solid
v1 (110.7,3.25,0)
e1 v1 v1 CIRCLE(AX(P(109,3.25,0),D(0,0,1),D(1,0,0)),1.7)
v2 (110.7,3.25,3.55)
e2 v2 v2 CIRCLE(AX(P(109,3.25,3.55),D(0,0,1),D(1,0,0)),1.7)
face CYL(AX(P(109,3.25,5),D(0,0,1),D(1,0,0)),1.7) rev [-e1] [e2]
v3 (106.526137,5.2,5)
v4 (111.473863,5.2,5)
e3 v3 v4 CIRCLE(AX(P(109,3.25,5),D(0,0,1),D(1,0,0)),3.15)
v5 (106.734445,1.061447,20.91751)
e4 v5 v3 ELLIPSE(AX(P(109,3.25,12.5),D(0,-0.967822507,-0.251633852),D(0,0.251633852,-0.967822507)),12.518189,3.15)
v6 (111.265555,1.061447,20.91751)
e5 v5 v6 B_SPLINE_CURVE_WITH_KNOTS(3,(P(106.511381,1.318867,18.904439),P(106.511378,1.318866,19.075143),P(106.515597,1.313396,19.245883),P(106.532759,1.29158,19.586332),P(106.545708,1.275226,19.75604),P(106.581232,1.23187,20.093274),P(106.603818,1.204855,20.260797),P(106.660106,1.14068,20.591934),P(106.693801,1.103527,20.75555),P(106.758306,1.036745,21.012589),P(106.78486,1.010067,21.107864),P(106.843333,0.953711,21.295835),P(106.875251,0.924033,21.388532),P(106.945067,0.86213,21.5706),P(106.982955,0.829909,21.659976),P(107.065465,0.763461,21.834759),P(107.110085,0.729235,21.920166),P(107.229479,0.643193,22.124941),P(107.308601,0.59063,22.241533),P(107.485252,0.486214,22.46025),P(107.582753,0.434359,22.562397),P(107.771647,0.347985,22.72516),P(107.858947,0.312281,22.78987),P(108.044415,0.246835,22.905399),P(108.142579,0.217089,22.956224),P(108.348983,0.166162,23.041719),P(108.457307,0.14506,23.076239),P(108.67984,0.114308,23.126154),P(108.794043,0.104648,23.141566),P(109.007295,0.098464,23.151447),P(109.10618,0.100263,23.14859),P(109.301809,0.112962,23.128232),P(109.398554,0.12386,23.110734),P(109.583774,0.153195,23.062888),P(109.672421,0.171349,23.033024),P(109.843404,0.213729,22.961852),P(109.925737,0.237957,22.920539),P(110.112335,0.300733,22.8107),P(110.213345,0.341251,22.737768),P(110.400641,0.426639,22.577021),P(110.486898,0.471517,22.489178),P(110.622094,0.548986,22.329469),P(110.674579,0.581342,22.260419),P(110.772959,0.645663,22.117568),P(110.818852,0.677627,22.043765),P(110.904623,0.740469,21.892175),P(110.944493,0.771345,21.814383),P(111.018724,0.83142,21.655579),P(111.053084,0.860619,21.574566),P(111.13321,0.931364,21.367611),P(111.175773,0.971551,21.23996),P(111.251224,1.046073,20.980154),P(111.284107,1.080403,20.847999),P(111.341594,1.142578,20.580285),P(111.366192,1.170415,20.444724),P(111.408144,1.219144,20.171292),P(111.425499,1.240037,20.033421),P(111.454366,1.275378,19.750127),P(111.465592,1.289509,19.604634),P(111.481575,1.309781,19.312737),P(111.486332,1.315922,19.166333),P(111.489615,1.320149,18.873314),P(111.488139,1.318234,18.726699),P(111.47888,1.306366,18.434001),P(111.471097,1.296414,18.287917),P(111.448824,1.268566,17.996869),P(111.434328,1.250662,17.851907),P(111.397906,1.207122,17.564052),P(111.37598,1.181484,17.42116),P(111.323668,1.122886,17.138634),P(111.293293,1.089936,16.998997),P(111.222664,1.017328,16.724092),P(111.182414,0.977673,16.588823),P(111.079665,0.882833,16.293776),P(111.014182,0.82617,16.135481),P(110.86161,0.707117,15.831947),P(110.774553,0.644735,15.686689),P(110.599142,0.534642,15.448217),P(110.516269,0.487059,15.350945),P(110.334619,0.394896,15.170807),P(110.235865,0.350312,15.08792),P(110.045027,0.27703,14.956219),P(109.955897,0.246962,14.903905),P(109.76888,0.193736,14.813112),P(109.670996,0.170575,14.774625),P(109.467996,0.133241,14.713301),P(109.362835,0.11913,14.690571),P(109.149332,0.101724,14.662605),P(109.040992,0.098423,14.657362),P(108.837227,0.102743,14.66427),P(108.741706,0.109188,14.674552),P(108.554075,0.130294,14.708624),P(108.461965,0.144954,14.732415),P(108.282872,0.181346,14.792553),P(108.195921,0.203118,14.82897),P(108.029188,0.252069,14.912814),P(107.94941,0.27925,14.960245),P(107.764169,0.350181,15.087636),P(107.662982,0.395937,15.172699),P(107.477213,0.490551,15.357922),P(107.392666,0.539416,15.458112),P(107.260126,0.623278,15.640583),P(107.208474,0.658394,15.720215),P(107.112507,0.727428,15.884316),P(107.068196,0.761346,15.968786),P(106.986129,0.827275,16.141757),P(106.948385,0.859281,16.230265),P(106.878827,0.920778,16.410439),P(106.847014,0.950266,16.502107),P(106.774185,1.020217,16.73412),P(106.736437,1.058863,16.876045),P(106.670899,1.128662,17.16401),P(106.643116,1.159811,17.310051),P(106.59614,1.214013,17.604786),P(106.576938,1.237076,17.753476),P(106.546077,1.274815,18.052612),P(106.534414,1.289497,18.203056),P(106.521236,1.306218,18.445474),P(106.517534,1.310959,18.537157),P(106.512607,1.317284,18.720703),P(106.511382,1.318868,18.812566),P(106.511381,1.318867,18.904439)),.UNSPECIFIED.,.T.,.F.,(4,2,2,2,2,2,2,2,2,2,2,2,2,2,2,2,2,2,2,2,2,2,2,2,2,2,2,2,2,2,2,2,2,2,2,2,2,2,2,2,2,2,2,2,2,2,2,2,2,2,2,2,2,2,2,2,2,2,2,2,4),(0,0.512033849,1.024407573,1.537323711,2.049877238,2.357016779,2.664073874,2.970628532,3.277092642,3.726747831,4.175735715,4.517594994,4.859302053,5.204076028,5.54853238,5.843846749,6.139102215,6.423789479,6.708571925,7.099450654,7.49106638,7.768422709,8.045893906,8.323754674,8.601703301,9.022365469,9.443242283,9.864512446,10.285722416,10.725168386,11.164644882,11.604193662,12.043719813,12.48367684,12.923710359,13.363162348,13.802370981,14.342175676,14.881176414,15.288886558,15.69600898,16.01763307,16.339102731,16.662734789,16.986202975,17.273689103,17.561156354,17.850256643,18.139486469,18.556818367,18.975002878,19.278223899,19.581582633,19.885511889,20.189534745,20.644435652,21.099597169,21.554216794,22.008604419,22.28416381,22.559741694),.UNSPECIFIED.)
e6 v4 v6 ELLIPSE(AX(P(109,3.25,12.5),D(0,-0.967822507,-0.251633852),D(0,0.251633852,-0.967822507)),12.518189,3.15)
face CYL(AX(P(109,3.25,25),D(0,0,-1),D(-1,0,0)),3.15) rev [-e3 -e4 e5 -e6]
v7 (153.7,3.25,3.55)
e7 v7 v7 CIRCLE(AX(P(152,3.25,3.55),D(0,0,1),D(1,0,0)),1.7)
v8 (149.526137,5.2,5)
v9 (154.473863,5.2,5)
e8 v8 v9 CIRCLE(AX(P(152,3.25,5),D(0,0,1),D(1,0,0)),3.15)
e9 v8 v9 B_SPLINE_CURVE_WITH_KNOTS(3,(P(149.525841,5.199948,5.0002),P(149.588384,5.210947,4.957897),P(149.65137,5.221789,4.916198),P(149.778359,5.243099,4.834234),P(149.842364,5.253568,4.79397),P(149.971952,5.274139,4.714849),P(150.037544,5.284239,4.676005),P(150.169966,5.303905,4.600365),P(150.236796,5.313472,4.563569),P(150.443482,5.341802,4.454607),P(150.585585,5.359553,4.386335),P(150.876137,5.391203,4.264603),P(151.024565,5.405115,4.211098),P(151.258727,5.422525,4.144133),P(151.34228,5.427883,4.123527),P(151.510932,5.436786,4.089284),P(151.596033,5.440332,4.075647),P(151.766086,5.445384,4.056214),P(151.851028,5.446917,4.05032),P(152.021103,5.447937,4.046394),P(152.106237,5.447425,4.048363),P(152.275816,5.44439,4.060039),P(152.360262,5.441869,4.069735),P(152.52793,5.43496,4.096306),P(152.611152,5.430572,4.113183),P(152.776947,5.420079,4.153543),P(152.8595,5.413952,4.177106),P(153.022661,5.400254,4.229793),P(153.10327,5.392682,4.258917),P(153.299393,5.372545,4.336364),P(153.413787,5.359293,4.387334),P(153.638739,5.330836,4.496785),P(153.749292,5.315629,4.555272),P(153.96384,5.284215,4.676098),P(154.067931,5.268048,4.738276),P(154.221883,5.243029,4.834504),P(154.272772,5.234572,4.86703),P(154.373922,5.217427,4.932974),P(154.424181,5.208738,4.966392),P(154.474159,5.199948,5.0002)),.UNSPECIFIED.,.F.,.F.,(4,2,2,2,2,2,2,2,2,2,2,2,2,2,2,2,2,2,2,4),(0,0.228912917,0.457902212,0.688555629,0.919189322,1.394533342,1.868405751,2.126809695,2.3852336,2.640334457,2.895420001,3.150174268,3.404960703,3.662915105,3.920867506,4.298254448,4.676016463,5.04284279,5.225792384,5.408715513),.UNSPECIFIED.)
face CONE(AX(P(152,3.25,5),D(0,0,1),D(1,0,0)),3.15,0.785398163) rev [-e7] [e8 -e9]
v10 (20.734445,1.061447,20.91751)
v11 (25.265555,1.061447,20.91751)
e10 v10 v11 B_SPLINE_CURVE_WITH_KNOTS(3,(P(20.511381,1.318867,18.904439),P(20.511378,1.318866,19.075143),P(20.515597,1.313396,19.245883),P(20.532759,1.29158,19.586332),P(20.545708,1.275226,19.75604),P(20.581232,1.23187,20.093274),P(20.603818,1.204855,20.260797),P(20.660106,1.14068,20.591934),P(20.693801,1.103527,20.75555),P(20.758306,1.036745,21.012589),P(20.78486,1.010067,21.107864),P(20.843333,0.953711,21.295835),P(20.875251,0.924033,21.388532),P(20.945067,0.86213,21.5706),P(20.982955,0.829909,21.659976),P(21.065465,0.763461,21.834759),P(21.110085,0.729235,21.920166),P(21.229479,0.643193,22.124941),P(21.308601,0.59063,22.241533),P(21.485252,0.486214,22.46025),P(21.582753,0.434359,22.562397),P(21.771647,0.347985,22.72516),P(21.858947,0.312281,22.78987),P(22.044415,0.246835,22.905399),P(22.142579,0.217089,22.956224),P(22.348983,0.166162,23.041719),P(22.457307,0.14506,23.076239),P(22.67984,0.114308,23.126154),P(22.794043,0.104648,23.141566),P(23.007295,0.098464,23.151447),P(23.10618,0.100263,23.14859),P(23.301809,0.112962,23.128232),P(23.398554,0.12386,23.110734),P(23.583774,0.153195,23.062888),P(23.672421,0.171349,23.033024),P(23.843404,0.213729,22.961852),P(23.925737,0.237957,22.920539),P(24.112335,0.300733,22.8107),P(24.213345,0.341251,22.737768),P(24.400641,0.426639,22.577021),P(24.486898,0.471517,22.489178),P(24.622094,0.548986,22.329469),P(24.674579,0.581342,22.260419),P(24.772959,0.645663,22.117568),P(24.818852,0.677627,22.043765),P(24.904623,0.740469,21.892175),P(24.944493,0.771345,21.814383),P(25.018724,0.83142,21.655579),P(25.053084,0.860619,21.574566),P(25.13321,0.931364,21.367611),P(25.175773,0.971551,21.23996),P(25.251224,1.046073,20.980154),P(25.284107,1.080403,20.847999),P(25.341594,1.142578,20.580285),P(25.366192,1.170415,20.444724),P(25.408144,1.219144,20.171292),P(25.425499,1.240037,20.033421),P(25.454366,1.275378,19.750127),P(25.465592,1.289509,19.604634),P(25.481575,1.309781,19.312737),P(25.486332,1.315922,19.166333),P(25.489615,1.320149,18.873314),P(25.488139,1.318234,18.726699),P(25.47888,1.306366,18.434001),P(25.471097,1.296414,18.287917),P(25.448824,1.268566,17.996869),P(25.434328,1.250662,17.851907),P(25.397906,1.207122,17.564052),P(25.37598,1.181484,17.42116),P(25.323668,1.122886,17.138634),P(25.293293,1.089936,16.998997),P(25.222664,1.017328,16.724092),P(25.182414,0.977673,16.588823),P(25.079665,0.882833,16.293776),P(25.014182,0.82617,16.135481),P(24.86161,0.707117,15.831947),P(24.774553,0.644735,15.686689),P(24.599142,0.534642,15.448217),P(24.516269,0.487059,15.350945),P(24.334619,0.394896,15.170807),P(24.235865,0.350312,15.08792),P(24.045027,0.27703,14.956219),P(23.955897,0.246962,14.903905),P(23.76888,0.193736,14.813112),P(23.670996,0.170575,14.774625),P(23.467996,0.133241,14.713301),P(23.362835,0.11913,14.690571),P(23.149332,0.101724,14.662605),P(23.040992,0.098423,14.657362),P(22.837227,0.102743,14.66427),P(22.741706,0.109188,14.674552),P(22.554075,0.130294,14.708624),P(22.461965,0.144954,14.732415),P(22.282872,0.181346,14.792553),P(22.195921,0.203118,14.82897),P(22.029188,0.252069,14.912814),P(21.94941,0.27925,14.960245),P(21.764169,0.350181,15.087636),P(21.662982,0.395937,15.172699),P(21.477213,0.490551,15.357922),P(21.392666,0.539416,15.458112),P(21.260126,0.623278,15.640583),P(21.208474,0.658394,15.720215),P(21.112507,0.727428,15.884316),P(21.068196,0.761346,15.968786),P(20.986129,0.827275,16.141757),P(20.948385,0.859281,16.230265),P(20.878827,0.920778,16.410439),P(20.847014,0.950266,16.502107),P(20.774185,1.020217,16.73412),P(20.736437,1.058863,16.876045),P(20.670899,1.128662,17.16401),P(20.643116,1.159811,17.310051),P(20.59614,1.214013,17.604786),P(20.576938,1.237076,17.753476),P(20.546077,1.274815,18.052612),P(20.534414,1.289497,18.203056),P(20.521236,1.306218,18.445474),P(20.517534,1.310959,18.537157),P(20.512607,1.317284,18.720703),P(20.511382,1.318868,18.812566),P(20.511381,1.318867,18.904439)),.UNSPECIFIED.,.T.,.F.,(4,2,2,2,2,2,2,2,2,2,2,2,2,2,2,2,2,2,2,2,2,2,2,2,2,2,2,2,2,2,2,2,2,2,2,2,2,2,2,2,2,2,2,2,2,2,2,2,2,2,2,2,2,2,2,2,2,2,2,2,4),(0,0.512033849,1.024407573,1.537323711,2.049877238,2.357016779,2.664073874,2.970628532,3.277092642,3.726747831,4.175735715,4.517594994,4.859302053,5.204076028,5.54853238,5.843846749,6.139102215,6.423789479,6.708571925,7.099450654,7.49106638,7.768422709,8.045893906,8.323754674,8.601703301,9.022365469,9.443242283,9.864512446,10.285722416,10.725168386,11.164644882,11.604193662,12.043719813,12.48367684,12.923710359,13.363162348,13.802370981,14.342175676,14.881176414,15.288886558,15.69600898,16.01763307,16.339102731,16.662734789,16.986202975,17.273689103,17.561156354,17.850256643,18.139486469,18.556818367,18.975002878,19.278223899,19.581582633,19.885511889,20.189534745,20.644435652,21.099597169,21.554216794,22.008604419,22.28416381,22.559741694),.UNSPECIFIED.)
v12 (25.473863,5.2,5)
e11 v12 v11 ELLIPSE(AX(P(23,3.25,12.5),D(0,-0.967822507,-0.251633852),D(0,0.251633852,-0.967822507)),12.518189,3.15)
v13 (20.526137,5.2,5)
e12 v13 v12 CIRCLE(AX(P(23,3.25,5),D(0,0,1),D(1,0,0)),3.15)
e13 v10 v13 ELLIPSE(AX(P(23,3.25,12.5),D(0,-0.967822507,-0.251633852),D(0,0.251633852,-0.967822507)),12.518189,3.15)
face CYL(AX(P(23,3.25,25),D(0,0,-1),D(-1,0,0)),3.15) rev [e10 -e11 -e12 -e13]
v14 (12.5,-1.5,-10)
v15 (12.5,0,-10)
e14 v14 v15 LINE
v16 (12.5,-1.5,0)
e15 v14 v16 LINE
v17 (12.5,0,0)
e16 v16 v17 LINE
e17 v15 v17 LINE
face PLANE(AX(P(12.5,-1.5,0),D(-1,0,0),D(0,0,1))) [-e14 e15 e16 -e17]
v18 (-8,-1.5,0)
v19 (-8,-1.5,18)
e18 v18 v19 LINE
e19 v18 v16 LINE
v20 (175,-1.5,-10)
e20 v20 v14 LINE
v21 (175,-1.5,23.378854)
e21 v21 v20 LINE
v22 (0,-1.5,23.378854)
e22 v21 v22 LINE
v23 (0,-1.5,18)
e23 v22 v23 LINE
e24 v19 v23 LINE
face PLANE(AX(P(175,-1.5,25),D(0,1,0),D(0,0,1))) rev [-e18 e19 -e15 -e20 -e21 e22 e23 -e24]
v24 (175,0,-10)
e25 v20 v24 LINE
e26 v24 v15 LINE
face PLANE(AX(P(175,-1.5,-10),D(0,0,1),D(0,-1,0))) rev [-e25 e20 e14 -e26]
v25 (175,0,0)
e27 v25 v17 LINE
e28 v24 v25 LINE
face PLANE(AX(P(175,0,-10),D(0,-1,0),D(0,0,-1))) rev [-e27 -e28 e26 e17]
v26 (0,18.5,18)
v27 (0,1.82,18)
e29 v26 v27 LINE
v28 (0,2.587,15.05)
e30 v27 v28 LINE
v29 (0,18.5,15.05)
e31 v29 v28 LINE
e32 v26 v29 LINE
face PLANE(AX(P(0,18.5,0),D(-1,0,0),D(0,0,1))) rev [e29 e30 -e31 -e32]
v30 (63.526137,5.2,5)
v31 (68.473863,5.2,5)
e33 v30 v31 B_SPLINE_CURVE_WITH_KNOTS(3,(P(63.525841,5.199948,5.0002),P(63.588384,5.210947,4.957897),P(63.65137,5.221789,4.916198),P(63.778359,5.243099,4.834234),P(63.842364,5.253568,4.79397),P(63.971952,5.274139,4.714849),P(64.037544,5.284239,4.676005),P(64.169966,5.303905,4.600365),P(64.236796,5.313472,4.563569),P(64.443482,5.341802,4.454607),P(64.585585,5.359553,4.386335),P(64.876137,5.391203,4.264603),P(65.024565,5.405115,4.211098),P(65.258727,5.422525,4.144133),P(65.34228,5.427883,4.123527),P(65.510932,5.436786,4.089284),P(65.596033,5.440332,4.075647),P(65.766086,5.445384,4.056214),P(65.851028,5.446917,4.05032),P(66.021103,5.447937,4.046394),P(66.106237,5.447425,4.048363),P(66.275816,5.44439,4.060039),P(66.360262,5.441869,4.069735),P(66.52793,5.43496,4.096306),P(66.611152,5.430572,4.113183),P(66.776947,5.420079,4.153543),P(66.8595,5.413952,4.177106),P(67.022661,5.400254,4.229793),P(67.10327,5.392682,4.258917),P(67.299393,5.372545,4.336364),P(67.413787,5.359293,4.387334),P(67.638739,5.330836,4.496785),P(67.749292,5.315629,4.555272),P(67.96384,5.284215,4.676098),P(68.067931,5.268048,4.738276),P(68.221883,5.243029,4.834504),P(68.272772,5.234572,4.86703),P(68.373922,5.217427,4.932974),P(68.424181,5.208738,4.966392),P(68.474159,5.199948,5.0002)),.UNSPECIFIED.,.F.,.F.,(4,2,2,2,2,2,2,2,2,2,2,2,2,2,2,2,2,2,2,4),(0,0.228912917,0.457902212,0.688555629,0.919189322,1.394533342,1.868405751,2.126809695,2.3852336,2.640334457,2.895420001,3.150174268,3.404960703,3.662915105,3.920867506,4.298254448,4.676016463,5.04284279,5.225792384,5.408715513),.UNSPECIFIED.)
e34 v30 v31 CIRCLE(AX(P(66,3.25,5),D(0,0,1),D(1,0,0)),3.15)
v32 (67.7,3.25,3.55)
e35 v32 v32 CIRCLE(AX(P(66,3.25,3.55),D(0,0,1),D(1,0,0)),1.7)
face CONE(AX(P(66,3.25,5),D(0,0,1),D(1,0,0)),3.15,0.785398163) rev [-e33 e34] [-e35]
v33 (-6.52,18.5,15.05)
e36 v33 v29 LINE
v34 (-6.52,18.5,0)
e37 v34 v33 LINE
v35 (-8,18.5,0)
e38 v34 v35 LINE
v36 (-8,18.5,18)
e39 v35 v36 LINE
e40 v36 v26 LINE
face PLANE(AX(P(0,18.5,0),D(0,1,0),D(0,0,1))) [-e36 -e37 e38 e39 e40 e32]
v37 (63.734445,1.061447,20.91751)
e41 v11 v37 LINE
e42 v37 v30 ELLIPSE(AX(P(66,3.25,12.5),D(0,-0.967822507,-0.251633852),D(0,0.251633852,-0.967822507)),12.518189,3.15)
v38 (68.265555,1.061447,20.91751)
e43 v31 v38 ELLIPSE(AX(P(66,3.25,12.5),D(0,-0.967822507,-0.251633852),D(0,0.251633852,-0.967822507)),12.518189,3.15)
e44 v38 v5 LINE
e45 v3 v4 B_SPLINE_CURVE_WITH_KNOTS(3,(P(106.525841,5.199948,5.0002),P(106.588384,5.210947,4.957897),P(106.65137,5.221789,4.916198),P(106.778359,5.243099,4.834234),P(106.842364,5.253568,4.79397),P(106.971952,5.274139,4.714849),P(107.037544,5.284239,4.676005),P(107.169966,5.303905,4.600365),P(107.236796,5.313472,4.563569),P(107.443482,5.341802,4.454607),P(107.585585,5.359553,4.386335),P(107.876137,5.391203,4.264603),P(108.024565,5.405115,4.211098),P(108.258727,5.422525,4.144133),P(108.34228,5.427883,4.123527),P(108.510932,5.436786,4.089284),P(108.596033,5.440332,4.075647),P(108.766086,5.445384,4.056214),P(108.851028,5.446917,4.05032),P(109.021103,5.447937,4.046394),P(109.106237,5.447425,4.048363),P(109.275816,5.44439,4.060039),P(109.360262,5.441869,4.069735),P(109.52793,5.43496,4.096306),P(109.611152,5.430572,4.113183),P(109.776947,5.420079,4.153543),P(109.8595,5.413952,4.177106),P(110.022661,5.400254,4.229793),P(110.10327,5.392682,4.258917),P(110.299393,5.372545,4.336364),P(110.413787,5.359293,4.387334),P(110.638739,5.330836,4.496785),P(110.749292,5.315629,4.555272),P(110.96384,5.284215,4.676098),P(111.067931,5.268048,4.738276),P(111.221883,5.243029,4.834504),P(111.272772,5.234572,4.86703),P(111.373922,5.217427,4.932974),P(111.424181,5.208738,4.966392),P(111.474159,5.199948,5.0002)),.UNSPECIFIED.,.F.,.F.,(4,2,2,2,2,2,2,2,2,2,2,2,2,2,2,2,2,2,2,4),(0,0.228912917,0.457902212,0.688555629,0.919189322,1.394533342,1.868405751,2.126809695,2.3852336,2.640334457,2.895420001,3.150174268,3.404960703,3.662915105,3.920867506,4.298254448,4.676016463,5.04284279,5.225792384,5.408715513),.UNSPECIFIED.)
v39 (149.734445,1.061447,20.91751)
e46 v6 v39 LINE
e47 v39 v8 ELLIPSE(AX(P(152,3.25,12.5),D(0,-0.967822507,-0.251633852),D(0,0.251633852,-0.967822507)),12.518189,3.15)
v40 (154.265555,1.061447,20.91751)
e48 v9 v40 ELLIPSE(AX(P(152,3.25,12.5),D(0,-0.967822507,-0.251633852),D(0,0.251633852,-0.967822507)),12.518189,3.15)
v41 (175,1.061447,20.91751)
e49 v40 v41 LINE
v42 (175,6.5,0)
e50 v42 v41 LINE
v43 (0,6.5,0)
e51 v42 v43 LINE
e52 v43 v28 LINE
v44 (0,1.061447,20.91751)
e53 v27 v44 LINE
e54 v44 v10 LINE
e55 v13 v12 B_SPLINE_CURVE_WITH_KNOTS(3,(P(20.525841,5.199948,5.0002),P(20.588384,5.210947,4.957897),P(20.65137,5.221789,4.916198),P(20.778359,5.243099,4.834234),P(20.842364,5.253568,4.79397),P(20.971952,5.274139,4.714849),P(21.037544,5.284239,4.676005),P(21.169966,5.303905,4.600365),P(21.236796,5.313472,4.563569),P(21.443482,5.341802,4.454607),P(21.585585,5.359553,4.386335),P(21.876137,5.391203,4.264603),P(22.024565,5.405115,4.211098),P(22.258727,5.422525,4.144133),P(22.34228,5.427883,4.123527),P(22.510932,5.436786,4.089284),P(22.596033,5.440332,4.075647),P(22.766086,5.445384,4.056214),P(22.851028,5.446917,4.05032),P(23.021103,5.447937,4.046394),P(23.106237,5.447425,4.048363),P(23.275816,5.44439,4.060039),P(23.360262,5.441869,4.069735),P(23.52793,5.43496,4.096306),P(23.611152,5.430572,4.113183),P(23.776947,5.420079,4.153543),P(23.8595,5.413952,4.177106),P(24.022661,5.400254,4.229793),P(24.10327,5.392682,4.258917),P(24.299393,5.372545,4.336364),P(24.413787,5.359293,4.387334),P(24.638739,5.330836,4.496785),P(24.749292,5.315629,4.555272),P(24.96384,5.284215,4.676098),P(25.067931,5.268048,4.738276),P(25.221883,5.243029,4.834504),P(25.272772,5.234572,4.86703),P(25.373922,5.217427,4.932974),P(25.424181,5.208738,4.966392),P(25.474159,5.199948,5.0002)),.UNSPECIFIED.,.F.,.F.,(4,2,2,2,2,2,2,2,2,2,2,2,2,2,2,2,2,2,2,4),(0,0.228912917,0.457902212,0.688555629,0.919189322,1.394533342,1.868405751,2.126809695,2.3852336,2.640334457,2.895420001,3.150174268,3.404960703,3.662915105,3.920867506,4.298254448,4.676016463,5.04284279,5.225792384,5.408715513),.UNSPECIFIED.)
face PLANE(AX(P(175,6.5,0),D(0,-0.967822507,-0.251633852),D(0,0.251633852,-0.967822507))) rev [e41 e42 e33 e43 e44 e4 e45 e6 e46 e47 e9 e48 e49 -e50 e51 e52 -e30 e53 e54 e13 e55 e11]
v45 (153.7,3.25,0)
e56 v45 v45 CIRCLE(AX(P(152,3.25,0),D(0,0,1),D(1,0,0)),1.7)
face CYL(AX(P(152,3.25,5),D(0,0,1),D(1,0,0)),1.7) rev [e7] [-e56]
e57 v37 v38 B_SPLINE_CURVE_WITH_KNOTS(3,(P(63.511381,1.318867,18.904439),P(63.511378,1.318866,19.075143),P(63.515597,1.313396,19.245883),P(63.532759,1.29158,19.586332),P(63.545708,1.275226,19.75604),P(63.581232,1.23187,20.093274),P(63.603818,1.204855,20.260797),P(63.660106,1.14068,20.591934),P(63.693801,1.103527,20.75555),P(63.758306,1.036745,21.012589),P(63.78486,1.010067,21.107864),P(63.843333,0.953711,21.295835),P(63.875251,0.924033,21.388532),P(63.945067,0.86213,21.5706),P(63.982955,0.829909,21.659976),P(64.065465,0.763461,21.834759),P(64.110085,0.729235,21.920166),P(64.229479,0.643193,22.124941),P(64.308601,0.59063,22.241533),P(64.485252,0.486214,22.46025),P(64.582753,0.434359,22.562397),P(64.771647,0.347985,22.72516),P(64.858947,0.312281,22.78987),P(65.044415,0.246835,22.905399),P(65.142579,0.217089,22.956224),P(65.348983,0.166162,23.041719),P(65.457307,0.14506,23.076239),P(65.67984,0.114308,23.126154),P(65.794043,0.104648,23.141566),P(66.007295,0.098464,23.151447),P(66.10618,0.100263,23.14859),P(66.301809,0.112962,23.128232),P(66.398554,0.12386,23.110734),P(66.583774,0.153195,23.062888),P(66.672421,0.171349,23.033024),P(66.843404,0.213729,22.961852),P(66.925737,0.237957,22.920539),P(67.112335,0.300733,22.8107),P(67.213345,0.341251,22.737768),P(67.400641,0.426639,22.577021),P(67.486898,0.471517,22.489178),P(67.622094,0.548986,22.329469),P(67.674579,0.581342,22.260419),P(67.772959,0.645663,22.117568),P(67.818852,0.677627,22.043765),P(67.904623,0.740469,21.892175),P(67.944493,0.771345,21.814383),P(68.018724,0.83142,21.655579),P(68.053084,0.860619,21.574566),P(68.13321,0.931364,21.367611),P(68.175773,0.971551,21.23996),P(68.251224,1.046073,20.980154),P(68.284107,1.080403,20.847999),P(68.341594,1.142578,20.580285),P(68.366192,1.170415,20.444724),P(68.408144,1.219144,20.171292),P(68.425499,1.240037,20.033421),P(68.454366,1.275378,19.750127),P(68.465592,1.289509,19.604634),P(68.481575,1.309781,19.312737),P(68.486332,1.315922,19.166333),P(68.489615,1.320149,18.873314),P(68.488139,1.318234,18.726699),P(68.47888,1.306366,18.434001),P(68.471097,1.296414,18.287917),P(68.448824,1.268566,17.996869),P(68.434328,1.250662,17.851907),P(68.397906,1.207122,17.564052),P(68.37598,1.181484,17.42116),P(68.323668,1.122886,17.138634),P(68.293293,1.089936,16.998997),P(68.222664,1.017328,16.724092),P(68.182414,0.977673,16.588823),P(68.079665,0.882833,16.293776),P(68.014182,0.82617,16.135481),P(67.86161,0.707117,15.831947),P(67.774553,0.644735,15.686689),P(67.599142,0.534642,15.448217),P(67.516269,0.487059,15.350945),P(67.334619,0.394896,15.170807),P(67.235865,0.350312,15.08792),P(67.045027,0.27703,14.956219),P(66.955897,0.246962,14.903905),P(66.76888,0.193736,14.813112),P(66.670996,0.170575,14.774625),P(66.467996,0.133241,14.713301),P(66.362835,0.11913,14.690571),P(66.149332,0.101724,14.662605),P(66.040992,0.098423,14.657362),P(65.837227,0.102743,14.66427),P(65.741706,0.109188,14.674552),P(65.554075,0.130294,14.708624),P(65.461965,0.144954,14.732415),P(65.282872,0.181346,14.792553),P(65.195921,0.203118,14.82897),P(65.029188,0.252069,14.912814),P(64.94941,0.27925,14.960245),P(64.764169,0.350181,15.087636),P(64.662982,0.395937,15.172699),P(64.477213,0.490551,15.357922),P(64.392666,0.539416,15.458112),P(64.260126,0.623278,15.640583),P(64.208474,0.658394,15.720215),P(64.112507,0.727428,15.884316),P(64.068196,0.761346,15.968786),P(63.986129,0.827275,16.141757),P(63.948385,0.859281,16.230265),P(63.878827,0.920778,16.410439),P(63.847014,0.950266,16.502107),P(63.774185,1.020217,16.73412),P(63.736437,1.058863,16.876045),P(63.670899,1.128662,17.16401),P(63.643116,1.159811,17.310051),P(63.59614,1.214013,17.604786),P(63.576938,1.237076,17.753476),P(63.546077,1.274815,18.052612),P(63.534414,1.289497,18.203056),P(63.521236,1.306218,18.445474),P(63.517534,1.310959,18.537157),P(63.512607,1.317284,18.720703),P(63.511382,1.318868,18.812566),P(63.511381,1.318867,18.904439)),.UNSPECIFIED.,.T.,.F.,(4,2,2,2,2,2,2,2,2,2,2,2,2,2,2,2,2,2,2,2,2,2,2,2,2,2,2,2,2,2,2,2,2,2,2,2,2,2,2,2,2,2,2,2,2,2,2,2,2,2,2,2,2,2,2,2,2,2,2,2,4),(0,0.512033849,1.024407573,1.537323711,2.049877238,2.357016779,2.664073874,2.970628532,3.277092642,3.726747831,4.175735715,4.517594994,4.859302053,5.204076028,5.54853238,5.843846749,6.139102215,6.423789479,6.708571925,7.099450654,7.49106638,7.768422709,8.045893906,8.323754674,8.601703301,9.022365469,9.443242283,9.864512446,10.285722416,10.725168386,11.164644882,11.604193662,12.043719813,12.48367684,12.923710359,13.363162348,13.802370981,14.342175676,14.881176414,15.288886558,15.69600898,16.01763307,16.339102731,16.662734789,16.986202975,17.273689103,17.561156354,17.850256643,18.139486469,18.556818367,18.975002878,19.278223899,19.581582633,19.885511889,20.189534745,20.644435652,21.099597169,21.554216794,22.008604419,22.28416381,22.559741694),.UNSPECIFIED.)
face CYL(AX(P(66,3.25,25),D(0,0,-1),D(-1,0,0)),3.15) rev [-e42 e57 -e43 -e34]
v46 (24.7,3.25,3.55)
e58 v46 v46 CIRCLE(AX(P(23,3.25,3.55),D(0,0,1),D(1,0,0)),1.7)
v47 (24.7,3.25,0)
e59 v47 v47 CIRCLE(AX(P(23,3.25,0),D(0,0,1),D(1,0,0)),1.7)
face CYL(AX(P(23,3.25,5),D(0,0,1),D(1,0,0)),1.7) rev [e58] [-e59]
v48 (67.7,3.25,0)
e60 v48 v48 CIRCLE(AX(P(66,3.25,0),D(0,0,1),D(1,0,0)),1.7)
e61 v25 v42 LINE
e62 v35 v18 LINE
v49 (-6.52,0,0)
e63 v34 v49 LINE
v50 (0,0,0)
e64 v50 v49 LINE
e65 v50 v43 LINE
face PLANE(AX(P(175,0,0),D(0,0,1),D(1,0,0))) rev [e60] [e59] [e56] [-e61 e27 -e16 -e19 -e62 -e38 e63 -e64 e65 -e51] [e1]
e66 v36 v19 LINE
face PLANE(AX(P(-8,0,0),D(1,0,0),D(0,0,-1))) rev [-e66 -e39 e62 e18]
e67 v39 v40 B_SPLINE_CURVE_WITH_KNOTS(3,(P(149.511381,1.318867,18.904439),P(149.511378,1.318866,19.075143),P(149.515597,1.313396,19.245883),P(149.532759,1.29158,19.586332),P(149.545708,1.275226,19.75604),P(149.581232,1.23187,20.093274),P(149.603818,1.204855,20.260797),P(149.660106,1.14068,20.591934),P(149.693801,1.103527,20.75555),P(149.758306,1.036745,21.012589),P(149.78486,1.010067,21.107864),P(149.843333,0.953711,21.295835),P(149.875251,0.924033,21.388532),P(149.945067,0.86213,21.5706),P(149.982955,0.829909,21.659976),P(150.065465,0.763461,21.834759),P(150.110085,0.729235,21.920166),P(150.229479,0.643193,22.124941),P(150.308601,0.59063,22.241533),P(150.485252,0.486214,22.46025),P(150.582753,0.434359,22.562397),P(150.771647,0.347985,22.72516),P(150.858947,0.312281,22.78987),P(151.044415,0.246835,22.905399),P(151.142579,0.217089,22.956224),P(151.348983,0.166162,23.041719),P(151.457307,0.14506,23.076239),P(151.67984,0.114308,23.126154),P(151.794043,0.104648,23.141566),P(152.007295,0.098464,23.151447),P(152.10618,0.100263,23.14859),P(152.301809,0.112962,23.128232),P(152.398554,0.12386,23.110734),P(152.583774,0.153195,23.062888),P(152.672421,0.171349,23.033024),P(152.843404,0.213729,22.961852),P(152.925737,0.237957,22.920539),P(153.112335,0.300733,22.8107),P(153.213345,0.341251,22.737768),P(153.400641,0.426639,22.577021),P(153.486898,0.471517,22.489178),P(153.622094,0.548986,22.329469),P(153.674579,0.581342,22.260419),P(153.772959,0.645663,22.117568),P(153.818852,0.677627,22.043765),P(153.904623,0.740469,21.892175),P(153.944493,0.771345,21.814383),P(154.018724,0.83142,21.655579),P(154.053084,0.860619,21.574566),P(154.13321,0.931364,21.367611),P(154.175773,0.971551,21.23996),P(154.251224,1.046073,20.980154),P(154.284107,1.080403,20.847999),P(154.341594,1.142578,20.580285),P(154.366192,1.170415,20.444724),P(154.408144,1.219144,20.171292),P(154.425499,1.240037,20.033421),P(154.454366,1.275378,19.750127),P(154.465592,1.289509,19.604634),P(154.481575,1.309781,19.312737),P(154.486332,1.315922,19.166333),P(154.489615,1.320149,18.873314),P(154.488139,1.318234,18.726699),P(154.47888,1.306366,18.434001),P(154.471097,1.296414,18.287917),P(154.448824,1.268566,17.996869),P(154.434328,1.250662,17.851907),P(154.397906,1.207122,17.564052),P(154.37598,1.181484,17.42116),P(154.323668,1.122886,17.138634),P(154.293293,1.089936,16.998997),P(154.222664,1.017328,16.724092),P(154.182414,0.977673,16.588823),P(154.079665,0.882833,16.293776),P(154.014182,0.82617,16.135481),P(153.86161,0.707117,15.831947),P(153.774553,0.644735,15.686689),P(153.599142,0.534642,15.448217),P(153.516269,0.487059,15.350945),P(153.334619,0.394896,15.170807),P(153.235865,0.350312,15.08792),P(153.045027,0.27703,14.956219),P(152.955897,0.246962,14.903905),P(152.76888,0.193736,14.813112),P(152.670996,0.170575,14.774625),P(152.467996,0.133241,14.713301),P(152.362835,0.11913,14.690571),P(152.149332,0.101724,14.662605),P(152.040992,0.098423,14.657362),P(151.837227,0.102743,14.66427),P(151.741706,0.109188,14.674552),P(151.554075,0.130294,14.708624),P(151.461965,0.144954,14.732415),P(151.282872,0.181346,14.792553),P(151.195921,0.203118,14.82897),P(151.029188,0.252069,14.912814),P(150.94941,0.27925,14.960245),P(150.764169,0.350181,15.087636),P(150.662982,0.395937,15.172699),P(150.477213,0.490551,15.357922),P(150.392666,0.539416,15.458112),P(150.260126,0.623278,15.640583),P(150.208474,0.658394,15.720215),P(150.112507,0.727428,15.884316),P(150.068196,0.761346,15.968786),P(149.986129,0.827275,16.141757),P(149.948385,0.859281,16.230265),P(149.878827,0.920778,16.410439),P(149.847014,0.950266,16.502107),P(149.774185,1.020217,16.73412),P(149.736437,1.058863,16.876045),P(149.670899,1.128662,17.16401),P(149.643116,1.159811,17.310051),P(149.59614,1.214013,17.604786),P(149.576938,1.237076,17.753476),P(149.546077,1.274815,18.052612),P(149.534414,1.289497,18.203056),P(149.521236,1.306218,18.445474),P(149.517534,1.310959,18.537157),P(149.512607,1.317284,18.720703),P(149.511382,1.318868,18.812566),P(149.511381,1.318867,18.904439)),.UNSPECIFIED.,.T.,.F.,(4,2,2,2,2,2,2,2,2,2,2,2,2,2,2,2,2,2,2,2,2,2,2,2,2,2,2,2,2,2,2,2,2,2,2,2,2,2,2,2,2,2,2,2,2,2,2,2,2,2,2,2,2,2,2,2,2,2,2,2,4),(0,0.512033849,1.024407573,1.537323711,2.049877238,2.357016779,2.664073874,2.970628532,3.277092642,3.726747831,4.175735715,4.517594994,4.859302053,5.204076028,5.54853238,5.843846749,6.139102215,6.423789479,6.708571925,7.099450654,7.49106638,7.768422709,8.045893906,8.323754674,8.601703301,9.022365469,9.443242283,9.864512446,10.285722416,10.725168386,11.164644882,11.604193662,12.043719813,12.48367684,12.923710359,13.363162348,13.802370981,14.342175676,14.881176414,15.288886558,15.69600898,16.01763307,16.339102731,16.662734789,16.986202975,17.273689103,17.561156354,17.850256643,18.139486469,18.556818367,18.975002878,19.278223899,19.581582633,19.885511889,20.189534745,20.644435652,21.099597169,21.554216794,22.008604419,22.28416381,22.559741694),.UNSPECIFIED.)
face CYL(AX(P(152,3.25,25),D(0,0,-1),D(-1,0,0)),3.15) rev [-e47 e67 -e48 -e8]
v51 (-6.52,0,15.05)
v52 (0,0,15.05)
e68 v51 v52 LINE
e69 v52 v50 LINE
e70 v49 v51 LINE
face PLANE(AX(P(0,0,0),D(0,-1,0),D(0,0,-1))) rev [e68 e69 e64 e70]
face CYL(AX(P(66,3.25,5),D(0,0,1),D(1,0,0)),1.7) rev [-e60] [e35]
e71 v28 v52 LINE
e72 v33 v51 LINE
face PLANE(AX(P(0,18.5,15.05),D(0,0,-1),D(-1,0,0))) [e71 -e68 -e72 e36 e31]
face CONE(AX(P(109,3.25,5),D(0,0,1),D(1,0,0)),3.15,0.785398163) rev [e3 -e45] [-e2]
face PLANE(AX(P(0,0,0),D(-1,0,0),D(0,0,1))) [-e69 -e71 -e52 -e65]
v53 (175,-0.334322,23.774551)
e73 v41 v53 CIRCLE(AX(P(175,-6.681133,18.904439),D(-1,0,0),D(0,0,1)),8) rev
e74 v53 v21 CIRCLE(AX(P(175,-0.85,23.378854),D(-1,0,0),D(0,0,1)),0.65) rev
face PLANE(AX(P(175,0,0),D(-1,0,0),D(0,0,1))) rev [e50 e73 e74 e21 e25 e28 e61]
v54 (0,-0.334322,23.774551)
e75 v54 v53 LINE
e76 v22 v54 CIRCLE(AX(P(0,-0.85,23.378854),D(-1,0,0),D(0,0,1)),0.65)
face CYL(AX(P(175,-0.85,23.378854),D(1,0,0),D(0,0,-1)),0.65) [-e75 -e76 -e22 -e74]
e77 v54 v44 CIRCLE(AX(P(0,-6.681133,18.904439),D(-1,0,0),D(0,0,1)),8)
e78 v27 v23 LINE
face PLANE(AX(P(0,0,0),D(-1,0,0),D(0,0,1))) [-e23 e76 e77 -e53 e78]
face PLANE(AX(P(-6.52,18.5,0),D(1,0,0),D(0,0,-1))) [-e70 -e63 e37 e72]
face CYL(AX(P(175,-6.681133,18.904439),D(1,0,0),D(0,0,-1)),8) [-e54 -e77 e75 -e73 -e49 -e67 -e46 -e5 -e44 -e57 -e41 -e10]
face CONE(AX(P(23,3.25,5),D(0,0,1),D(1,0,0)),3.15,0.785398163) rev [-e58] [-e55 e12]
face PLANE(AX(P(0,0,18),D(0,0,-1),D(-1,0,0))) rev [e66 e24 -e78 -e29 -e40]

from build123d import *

# Parameters (mm, degrees)
BOSS_EXTRUDE1_DEPTH                          = 175
FILLET1_R                                    = 8
CSK_FOR_M3_COUNTERSUNK_FLAT_HEAD_SCR_2_COUNT = 2
CSK_FOR_M3_COUNTERSUNK_FLAT_HEAD_SCR_2_PITCH = 129
CSK_FOR_M3_COUNTERSUNK_FLAT_HEAD_SCR_3_COUNT = 2
CSK_FOR_M3_COUNTERSUNK_FLAT_HEAD_SCR_3_PITCH = 86
CSK_FOR_M3_COUNTERSUNK_FLAT_HEAD_SCR_4_COUNT = 2
CSK_FOR_M3_COUNTERSUNK_FLAT_HEAD_SCR_4_PITCH = 43
CUT_EXTRUDE2_DEPTH                           = 177.259042321
SKETCH8_W                                    = 12.5
SKETCH8_H                                    = 10
CUT_EXTRUDE3_DEPTH                           = 177.896156092
SKETCH10_W                                   = 8
SKETCH10_H                                   = 18
BOSS_EXTRUDE2_DEPTH                          = 1.5
BOSS_EXTRUDE3_DEPTH                          = 18.5
FILLET2_R                                    = 0.65


with BuildPart() as part:
    # Sketch1 → Boss-Extrude1 (new body)
    with BuildSketch(Plane(origin=(0, 0, 0), x_dir=(0, 0, -1), z_dir=(1, 0, 0))):
        Polygon((0, 6.5), (-25, 0), (-25, -1.5), (10, -1.5), (10, 0), (0, 0), align=None)
    extrude(amount=BOSS_EXTRUDE1_DEPTH)

    # Fillet1
    # the kernel refuses this fillet: 8 mm, written as the material it takes off along each edge
    with BuildSketch(Plane(origin=(-10.545555265, 0, 25), x_dir=(0, 0.2516338517649508, -0.967822506788272), z_dir=(1, 0, 0))) as fillet1_piece_1:
        with BuildLine():
            CenterArc((4.218222106, -8), FILLET1_R, 90, 35.061762164)
            Line((-0.377450778, -1.45173376), (-0.469364235, -1.320768435))
            ThreePointArc((-0.469364235, -1.320768435), (-0.34357699, -0.685605464), (-0.154851601, 0.040261416))
            Line((-0.154851601, 0.040261416), (0, 0.16))
            Line((0, 0.16), (4.218222106, 0.16))
            Line((4.218222106, 0.16), (4.218222106, 0))
        make_face()
    extrude(amount=196.091110529, mode=Mode.SUBTRACT)

    # Sketch5 → CSK for M3 Countersunk Flat Head Screw1 (revolve, cut)
    with BuildSketch(Plane(origin=(152, 3.25, 5), x_dir=(0, -1, 0), z_dir=(1, 0, 0))):
        Polygon((0, 0), (0, 15), (1.7, 15), (1.7, 1.45), (3.15, 0), align=None)
    csk_for_m3_countersunk_flat_head_screw1 = revolve(axis=Axis((152, 3.25, 11.35), (0, 0, -1)), mode=Mode.SUBTRACT)

    # CSK for M3 Countersunk Flat Head Scr 2: CSK for M3 Countersunk Flat Head Screw1 ×2
    with Locations(*[(-i * CSK_FOR_M3_COUNTERSUNK_FLAT_HEAD_SCR_2_PITCH, 0, 0) for i in range(1, CSK_FOR_M3_COUNTERSUNK_FLAT_HEAD_SCR_2_COUNT)]):
        add(csk_for_m3_countersunk_flat_head_screw1, mode=Mode.SUBTRACT)

    # CSK for M3 Countersunk Flat Head Scr 3: CSK for M3 Countersunk Flat Head Screw1 ×2
    with Locations(*[(-i * CSK_FOR_M3_COUNTERSUNK_FLAT_HEAD_SCR_3_PITCH, 0, 0) for i in range(1, CSK_FOR_M3_COUNTERSUNK_FLAT_HEAD_SCR_3_COUNT)]):
        add(csk_for_m3_countersunk_flat_head_screw1, mode=Mode.SUBTRACT)

    # CSK for M3 Countersunk Flat Head Scr 4: CSK for M3 Countersunk Flat Head Screw1 ×2
    with Locations(*[(-i * CSK_FOR_M3_COUNTERSUNK_FLAT_HEAD_SCR_4_PITCH, 0, 0) for i in range(1, CSK_FOR_M3_COUNTERSUNK_FLAT_HEAD_SCR_4_COUNT)]):
        add(csk_for_m3_countersunk_flat_head_screw1, mode=Mode.SUBTRACT)

    # Sketch7 → Cut-Extrude2 (cut, through all)
    with BuildSketch(Plane(origin=(0, 0, 5), x_dir=(-1, 0, 0), z_dir=(0, 0, -1))):
        with BuildLine():
            Line((-149.526136625, 5.2), (-154.473863375, 5.2))
            ThreePointArc((-154.473863375, 5.2), (-152, 0.1), (-149.526136625, 5.2))
        make_face()
        with BuildLine():
            Line((-20.526136625, 5.2), (-25.473863375, 5.2))
            ThreePointArc((-25.473863375, 5.2), (-23, 0.1), (-20.526136625, 5.2))
        make_face()
        with BuildLine():
            Line((-63.526136625, 5.2), (-68.473863375, 5.2))
            ThreePointArc((-68.473863375, 5.2), (-66, 0.1), (-63.526136625, 5.2))
        make_face()
        with BuildLine():
            Line((-106.526136625, 5.2), (-111.473863375, 5.2))
            ThreePointArc((-111.473863375, 5.2), (-109, 0.1), (-106.526136625, 5.2))
        make_face()
    extrude(amount=-CUT_EXTRUDE2_DEPTH, mode=Mode.SUBTRACT)

    # Sketch8 → Cut-Extrude3 (cut, through all)
    with BuildSketch(Plane(origin=(0, 0, 0), x_dir=(1, 0, 0), z_dir=(0, 1, 0))):
        with Locations((6.25, 5)):
            Rectangle(SKETCH8_W, SKETCH8_H)
    extrude(amount=-CUT_EXTRUDE3_DEPTH, mode=Mode.SUBTRACT)

    # Sketch10 → Boss-Extrude2 (add)
    with BuildSketch(Plane.XZ.offset(1.5)):
        with Locations((-4, 9)):
            Rectangle(SKETCH10_W, SKETCH10_H)
    extrude(amount=-BOSS_EXTRUDE2_DEPTH)

    # Sketch11 → Boss-Extrude3 (add)
    with BuildSketch(Plane(origin=(0, 0, 0), x_dir=(1, 0, 0), z_dir=(0, 1, 0))):
        Polygon((-6.52, -15.05), (-6.52, 0), (-8, 0), (-8, -18), (0, -18), (0, -15.05), align=None)
    extrude(amount=BOSS_EXTRUDE3_DEPTH)

    # Fillet2
    fillet2_edges = [part.edges().sort_by_distance(p)[0] for p in [
        (87.5, -1.5, 25),
    ]]
    fillet(fillet2_edges, radius=FILLET2_R)


solid = part.part
